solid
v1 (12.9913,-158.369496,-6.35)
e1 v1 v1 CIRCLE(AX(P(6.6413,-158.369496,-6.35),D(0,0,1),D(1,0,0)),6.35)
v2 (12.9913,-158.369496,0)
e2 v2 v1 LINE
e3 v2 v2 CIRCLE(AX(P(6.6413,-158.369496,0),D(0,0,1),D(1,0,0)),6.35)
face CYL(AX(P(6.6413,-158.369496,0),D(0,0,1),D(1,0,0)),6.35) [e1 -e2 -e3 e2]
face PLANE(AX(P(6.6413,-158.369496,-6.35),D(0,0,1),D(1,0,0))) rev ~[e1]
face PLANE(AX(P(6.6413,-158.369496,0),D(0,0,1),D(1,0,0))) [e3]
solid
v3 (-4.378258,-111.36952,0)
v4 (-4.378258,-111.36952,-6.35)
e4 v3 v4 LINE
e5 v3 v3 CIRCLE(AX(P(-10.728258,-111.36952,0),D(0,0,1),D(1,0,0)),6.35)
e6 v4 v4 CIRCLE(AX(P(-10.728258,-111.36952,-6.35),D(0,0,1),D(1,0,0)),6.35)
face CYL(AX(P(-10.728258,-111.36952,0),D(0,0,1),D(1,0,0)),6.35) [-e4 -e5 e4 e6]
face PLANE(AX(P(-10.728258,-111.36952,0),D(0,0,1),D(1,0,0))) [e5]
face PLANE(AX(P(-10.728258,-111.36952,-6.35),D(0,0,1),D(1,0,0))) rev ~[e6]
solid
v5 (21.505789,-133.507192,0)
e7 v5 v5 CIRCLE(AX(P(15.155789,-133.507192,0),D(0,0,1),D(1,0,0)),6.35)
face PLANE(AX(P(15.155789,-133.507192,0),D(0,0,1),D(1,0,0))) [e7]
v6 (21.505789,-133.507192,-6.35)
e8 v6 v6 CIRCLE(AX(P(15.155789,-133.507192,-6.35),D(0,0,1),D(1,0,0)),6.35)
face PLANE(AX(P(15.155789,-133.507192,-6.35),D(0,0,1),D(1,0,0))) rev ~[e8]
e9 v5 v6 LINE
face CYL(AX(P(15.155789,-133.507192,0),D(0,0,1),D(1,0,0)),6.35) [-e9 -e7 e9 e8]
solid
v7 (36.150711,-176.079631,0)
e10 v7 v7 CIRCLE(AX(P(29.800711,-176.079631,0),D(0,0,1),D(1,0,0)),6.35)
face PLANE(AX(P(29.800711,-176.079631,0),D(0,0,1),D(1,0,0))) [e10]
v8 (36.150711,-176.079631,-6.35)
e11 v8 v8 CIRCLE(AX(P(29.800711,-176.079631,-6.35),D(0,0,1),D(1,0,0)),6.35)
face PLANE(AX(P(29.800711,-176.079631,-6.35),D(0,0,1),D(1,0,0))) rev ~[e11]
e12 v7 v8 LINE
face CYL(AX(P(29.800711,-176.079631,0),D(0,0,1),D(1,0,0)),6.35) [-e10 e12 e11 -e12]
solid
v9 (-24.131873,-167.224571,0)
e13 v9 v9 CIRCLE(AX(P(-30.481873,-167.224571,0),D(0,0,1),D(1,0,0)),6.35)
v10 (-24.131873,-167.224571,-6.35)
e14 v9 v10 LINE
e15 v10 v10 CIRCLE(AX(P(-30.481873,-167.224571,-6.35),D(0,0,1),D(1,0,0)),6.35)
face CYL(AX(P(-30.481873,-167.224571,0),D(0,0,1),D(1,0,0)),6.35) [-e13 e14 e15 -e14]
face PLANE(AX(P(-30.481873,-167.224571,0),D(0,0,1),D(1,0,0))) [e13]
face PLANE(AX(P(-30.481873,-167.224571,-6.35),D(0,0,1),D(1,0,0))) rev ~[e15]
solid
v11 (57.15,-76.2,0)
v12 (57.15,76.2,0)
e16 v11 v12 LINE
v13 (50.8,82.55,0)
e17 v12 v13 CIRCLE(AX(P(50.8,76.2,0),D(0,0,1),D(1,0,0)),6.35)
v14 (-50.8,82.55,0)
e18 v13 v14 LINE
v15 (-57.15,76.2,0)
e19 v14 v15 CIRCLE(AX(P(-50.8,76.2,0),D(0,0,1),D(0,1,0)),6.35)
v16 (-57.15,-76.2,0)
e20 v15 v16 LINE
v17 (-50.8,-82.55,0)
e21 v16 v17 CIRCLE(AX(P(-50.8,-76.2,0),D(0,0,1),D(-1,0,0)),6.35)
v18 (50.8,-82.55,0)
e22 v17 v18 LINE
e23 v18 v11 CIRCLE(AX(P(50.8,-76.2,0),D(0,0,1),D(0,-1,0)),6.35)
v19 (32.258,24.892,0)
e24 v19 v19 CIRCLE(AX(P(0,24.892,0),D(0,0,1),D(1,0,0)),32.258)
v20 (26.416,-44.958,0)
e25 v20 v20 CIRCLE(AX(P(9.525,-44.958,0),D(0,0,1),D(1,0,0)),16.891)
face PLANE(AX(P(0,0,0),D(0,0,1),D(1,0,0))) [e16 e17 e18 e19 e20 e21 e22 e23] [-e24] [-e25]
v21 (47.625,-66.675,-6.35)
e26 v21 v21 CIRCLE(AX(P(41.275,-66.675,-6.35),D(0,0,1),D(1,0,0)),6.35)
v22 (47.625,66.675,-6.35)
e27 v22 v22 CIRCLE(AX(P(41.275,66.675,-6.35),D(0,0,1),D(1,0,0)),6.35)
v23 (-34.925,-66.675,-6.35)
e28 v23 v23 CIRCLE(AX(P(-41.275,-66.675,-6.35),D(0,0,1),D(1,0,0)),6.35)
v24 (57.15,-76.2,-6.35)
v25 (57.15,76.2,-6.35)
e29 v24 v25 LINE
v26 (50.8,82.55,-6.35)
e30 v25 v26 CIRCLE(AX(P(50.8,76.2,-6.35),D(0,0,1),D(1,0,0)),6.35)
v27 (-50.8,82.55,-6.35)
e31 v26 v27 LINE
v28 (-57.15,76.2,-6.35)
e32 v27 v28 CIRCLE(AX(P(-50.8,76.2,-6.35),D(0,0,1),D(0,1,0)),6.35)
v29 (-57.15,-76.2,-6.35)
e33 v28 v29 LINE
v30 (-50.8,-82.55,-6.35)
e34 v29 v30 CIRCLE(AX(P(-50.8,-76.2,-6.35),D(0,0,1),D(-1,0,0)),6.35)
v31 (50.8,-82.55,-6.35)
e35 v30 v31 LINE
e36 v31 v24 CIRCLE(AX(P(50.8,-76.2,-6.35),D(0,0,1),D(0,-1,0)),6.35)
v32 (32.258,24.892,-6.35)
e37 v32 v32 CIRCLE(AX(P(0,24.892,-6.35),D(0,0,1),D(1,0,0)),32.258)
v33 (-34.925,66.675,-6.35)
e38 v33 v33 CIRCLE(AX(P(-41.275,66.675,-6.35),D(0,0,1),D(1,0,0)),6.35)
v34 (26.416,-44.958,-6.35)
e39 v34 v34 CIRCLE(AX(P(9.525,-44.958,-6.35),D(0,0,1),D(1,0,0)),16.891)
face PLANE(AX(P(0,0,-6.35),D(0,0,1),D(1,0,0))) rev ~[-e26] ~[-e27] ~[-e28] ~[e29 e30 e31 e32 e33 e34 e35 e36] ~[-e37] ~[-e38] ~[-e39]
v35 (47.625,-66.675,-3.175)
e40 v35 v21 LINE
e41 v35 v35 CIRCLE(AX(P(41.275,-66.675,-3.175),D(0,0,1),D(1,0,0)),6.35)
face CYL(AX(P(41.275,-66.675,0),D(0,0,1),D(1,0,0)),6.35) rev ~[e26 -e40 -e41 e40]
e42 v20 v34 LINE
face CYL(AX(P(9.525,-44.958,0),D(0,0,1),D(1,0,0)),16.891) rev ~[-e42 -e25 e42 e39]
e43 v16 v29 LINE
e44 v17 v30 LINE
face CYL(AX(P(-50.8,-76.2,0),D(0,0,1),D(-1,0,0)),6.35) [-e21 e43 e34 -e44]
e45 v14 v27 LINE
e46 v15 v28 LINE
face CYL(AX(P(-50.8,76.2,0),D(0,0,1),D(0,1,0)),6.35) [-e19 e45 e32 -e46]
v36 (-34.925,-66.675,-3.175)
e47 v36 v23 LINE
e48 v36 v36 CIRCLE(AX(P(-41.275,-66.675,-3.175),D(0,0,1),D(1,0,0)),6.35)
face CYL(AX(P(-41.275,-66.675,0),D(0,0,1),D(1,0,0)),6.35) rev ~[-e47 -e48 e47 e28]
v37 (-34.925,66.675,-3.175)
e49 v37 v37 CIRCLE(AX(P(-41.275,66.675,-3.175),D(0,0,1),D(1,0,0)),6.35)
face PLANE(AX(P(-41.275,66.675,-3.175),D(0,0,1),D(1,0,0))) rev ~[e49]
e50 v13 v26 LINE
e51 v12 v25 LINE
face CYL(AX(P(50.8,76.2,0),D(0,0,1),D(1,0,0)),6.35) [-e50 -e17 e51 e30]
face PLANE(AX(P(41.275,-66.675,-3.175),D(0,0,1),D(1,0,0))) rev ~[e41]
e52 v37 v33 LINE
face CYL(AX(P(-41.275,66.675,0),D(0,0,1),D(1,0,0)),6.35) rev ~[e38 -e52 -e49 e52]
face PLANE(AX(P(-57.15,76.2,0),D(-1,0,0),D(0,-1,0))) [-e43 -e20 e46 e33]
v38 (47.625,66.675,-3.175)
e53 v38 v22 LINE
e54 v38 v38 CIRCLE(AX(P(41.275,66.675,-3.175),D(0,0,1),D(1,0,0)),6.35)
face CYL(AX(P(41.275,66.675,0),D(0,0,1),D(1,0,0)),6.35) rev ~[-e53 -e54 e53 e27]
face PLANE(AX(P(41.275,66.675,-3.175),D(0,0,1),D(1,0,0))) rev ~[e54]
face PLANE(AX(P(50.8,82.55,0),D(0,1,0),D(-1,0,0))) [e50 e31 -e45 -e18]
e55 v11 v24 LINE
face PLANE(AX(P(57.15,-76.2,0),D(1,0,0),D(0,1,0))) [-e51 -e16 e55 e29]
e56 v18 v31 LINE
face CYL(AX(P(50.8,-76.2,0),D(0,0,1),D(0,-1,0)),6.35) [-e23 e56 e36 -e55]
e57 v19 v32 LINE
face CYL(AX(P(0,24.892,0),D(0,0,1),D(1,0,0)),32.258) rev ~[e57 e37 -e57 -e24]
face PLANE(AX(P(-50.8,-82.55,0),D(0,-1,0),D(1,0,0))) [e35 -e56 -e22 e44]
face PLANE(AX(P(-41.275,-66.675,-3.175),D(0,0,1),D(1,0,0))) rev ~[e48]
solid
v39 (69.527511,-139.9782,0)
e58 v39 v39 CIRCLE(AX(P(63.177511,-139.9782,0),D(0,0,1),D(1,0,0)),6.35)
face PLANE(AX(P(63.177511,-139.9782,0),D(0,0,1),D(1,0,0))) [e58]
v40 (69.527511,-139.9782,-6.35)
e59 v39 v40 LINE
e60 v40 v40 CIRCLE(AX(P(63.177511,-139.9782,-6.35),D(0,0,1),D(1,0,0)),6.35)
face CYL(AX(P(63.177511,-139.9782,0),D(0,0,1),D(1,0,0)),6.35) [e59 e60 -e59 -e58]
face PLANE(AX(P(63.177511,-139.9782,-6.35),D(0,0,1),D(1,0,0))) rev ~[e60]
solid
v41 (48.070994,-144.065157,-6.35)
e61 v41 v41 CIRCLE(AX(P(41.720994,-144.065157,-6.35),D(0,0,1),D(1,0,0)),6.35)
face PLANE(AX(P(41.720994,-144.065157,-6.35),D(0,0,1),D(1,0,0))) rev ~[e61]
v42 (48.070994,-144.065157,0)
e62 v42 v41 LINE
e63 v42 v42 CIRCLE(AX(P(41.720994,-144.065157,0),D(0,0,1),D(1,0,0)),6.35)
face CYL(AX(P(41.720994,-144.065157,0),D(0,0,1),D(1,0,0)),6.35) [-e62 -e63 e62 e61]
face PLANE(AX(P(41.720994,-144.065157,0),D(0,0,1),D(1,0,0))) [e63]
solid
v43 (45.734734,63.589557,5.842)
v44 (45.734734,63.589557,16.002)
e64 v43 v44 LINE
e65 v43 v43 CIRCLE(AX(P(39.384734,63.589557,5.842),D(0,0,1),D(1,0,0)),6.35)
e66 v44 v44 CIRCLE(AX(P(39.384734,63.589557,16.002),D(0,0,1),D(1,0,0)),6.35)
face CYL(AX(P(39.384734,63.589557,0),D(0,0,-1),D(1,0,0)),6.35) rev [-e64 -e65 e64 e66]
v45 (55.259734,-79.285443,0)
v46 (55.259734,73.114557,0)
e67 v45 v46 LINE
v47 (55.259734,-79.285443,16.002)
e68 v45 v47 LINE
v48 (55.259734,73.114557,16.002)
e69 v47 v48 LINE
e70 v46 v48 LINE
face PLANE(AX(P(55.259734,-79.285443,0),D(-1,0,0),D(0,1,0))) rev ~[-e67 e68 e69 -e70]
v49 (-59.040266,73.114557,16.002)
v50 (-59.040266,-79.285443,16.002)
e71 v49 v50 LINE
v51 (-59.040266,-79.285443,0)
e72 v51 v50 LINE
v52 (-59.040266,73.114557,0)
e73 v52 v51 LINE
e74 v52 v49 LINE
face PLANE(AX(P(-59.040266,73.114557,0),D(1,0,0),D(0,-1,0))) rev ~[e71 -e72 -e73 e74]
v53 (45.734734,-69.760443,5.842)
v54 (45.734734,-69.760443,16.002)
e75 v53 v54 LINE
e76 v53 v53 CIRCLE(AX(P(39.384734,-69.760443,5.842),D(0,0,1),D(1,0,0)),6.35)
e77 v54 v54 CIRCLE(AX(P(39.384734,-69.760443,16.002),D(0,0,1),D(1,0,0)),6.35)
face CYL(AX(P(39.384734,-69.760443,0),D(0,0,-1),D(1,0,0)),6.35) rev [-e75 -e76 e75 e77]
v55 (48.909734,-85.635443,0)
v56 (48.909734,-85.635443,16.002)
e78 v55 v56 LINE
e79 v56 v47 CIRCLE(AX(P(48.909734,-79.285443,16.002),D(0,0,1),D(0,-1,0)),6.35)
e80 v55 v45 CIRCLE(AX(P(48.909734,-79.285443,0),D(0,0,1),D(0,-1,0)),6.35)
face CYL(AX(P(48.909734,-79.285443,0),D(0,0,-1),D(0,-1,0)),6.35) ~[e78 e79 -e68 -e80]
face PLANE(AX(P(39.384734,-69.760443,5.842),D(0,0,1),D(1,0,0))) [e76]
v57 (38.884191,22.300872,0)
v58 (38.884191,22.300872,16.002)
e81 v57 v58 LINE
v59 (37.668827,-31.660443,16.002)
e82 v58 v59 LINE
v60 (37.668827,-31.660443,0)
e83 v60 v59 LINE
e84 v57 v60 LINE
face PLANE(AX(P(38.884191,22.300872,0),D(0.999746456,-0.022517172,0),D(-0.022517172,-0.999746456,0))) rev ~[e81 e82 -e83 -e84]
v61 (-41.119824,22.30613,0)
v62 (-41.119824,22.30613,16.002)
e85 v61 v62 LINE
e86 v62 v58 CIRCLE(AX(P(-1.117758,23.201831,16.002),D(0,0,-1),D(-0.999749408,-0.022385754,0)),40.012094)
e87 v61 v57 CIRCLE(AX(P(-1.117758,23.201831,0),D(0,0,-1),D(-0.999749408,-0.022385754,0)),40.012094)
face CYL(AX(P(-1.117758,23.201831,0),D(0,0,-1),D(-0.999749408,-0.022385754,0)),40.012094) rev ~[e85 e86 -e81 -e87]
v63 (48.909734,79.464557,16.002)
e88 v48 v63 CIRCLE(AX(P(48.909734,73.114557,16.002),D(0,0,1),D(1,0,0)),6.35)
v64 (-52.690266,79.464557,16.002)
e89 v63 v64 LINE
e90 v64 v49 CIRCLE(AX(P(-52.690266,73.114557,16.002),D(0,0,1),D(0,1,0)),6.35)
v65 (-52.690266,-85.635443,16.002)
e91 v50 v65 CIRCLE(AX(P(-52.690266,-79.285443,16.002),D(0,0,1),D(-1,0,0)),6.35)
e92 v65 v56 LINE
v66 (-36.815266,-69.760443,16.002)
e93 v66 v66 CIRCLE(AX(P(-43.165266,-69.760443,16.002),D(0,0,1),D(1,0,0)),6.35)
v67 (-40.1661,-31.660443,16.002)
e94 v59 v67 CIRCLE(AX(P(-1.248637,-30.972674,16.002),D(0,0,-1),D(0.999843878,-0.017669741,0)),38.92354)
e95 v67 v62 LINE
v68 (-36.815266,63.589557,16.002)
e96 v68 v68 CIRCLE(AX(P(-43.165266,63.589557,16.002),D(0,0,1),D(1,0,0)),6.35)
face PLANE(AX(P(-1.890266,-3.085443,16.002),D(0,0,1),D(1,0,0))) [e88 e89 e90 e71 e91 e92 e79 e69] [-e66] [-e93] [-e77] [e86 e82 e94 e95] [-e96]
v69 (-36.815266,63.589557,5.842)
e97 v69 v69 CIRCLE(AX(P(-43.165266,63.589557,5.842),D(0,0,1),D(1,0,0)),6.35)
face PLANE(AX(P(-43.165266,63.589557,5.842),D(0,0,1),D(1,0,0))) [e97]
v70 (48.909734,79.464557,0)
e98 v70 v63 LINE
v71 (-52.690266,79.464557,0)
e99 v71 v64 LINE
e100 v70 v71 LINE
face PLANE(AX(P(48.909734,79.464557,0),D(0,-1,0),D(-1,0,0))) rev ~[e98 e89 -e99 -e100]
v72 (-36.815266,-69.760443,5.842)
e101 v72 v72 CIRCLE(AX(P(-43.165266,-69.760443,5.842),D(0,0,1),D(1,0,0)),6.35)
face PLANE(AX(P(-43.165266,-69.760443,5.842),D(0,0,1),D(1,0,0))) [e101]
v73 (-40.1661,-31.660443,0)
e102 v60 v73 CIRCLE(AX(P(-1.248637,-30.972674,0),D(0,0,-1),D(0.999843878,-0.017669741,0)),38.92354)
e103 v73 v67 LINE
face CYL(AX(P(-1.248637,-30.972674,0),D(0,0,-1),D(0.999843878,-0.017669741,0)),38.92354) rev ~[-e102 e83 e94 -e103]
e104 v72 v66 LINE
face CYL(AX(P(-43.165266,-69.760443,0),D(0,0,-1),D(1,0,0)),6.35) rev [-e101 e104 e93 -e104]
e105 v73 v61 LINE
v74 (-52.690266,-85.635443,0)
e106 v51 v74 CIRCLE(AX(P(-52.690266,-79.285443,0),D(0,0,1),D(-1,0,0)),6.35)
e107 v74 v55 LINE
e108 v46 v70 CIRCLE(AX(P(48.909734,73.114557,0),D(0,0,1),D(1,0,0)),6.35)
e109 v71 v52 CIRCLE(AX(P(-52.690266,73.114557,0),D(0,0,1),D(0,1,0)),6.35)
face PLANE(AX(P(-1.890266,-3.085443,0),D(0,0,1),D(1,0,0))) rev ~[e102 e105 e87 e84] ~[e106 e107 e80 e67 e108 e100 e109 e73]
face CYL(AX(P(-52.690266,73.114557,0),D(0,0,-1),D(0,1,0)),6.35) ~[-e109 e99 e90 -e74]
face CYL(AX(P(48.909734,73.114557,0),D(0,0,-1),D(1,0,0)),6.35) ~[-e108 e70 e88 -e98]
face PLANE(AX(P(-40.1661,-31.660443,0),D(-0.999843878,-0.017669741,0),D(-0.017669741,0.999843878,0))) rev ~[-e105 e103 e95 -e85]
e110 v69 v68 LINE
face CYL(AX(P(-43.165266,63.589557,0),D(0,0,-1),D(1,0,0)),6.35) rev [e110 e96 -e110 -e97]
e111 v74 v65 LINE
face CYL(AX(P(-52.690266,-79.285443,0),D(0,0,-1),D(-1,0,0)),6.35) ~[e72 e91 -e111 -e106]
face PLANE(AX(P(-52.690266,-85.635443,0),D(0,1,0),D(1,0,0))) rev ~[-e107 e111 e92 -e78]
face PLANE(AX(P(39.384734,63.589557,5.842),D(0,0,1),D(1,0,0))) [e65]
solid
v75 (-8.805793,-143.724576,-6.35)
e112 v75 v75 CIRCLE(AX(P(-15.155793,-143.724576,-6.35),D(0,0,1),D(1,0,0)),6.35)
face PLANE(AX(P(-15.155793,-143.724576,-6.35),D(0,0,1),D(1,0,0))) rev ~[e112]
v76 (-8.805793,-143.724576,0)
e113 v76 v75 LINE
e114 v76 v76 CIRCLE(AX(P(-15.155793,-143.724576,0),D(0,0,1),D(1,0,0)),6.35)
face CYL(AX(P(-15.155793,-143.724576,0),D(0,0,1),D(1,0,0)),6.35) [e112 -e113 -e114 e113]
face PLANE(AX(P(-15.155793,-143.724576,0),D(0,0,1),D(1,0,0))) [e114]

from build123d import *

# Parameters (mm, degrees)
F0_R     = 6.35
F2_DEPTH = 3.175
F0_R_2   = 16.891
F0_R_3   = 32.258
F3_DEPTH = 6.35
F1_R     = 6.35
F4_DEPTH = 5.842
F5_DEPTH = 16.002
F6_R     = 6.35
F7_DEPTH = 6.35


with BuildPart() as f2:
    # F0 (on Top) → F2 (new body)
    with BuildSketch(Plane.XY):
        with Locations((-41.275, -66.675)):
            Circle(F0_R)
    extrude(amount=-F2_DEPTH)



with BuildPart() as f2b:
    # F0 (on Top) → F2, piece 2 (new body)
    with BuildSketch(Plane.XY):
        with Locations((-41.275, 66.675)):
            Circle(F0_R)
    extrude(amount=-F2_DEPTH)


with BuildPart() as f2c:
    # F0 (on Top) → F2, piece 3 (new body)
    with BuildSketch(Plane.XY):
        with Locations((41.275, 66.675)):
            Circle(F0_R)
    extrude(amount=-F2_DEPTH)


with BuildPart() as f2d:
    # F0 (on Top) → F2, piece 4 (new body)
    with BuildSketch(Plane.XY):
        with Locations((41.275, -66.675)):
            Circle(F0_R)
    extrude(amount=-F2_DEPTH)


with BuildPart() as f2_1:
    add(f2.part)

    add(f2b.part)  # F3 merges F2b

    add(f2c.part)  # F3 merges F2c

    add(f2d.part)  # F3 merges F2d
    # F0 (on Top) → F3 (join)
    with BuildSketch(Plane.XY):
        with BuildLine():
            Line((-50.8, -82.55), (50.8, -82.55))
            ThreePointArc((50.8, -82.55), (55.2901280605, -80.6901280605), (57.15, -76.2))
            Line((57.15, -76.2), (57.15, 76.2))
            ThreePointArc((57.15, 76.2), (55.2901280605, 80.6901280605), (50.8, 82.55))
            Line((50.8, 82.55), (-50.8, 82.55))
            ThreePointArc((-50.8, 82.55), (-55.2901280605, 80.6901280605), (-57.15, 76.2))
            Line((-57.15, 76.2), (-57.15, -76.2))
            ThreePointArc((-57.15, -76.2), (-55.2901280605, -80.6901280605), (-50.8, -82.55))
        make_face()
        with Locations((-41.275, -66.675)):
            Circle(F0_R, mode=Mode.SUBTRACT)
        with Locations((9.525, -44.958)):
            Circle(F0_R_2, mode=Mode.SUBTRACT)
        with Locations((41.275, -66.675)):
            Circle(F0_R, mode=Mode.SUBTRACT)
        with Locations((-41.275, 66.675)):
            Circle(F0_R, mode=Mode.SUBTRACT)
        with Locations((0, 24.892)):
            Circle(F0_R_3, mode=Mode.SUBTRACT)
        with Locations((41.275, 66.675)):
            Circle(F0_R, mode=Mode.SUBTRACT)
    extrude(amount=-F3_DEPTH)


with BuildPart() as f4:
    # F1 (on Top) → F4 (new body)
    with BuildSketch(Plane.XY):
        with Locations((39.384733719, 63.5895566996)):
            Circle(F1_R)
    extrude(amount=F4_DEPTH)



with BuildPart() as f4b:
    # F1 (on Top) → F4, piece 2 (new body)
    with BuildSketch(Plane.XY):
        with Locations((-43.165266281, 63.5895566996)):
            Circle(F1_R)
    extrude(amount=F4_DEPTH)


with BuildPart() as f4c:
    # F1 (on Top) → F4, piece 3 (new body)
    with BuildSketch(Plane.XY):
        with Locations((-43.165266281, -69.7604433004)):
            Circle(F1_R)
    extrude(amount=F4_DEPTH)


with BuildPart() as f4d:
    # F1 (on Top) → F4, piece 4 (new body)
    with BuildSketch(Plane.XY):
        with Locations((39.384733719, -69.7604433004)):
            Circle(F1_R)
    extrude(amount=F4_DEPTH)


with BuildPart() as f4_1:
    add(f4.part)

    add(f4b.part)  # F5 merges F4b

    add(f4c.part)  # F5 merges F4c

    add(f4d.part)  # F5 merges F4d
    # F1 (on Top) → F5 (join)
    with BuildSketch(Plane.XY):
        with BuildLine():
            Line((-52.690266281, -85.6354433004), (48.909733719, -85.6354433004))
            ThreePointArc((48.909733719, -85.6354433004), (53.3998617796, -83.7755713609), (55.259733719, -79.2854433004))
            Line((55.259733719, -79.2854433004), (55.259733719, 73.1145566996))
            ThreePointArc((55.259733719, 73.1145566996), (53.3998617796, 77.6046847601), (48.909733719, 79.4645566996))
            Line((48.909733719, 79.4645566996), (-52.690266281, 79.4645566996))
            ThreePointArc((-52.690266281, 79.4645566996), (-57.1803943415, 77.6046847601), (-59.040266281, 73.1145566996))
            Line((-59.040266281, 73.1145566996), (-59.040266281, -79.2854433004))
            ThreePointArc((-59.040266281, -79.2854433004), (-57.1803943415, -83.7755713609), (-52.690266281, -85.6354433004))
        make_face()
        with Locations((-43.165266281, -69.7604433004)):
            Circle(F1_R, mode=Mode.SUBTRACT)
        with Locations((39.384733719, -69.7604433004)):
            Circle(F1_R, mode=Mode.SUBTRACT)
        with BuildLine():
            ThreePointArc((-41.1198244616, 22.3061300117), (-1.1151278345, 63.2139243167), (38.8841910485, 22.3008716804))
            Line((38.8841910485, 22.3008716804), (37.668826681, -31.6604433004))
            ThreePointArc((37.668826681, -31.6604433004), (-1.2486367631, -69.896214704), (-40.1661002073, -31.6604433004))
            Line((-40.1661002073, -31.6604433004), (-41.1198244616, 22.3061300117))
        make_face(mode=Mode.SUBTRACT)
        with Locations((-43.165266281, 63.5895566996)):
            Circle(F1_R, mode=Mode.SUBTRACT)
        with Locations((39.384733719, 63.5895566996)):
            Circle(F1_R, mode=Mode.SUBTRACT)
    extrude(amount=F5_DEPTH)


with BuildPart() as f7:
    # F6 (on Top) → F7 (new body)
    with BuildSketch(Plane.XY):
        with Locations((29.8007111996, -176.0796308517)):
            Circle(F6_R)
    extrude(amount=-F7_DEPTH)


with BuildPart() as f7b:
    # F6 (on Top) → F7, piece 2 (new body)
    with BuildSketch(Plane.XY):
        with Locations((63.177511096, -139.9782001972)):
            Circle(F6_R)
    extrude(amount=-F7_DEPTH)


with BuildPart() as f7c:
    # F6 (on Top) → F7, piece 3 (new body)
    with BuildSketch(Plane.XY):
        with Locations((41.7209938169, -144.065156579)):
            Circle(F6_R)
    extrude(amount=-F7_DEPTH)


with BuildPart() as f7d:
    # F6 (on Top) → F7, piece 4 (new body)
    with BuildSketch(Plane.XY):
        with Locations((6.6412999295, -158.3694964647)):
            Circle(F6_R)
    extrude(amount=-F7_DEPTH)


with BuildPart() as f7e:
    # F6 (on Top) → F7, piece 5 (new body)
    with BuildSketch(Plane.XY):
        with Locations((-30.4818730801, -167.2245711088)):
            Circle(F6_R)
    extrude(amount=-F7_DEPTH)


with BuildPart() as f7f:
    # F6 (on Top) → F7, piece 6 (new body)
    with BuildSketch(Plane.XY):
        with Locations((-15.1557931677, -143.7245756388)):
            Circle(F6_R)
    extrude(amount=-F7_DEPTH)


with BuildPart() as f7g:
    # F6 (on Top) → F7, piece 7 (new body)
    with BuildSketch(Plane.XY):
        with Locations((15.1557894424, -133.5071921349)):
            Circle(F6_R)
    extrude(amount=-F7_DEPTH)


with BuildPart() as f7h:
    # F6 (on Top) → F7, piece 8 (new body)
    with BuildSketch(Plane.XY):
        with Locations((-10.7282577083, -111.3695204258)):
            Circle(F6_R)
    extrude(amount=-F7_DEPTH)


solid = Compound([f2_1.part, f4_1.part, f7.part, f7b.part, f7c.part, f7d.part, f7e.part, f7f.part, f7g.part, f7h.part])
